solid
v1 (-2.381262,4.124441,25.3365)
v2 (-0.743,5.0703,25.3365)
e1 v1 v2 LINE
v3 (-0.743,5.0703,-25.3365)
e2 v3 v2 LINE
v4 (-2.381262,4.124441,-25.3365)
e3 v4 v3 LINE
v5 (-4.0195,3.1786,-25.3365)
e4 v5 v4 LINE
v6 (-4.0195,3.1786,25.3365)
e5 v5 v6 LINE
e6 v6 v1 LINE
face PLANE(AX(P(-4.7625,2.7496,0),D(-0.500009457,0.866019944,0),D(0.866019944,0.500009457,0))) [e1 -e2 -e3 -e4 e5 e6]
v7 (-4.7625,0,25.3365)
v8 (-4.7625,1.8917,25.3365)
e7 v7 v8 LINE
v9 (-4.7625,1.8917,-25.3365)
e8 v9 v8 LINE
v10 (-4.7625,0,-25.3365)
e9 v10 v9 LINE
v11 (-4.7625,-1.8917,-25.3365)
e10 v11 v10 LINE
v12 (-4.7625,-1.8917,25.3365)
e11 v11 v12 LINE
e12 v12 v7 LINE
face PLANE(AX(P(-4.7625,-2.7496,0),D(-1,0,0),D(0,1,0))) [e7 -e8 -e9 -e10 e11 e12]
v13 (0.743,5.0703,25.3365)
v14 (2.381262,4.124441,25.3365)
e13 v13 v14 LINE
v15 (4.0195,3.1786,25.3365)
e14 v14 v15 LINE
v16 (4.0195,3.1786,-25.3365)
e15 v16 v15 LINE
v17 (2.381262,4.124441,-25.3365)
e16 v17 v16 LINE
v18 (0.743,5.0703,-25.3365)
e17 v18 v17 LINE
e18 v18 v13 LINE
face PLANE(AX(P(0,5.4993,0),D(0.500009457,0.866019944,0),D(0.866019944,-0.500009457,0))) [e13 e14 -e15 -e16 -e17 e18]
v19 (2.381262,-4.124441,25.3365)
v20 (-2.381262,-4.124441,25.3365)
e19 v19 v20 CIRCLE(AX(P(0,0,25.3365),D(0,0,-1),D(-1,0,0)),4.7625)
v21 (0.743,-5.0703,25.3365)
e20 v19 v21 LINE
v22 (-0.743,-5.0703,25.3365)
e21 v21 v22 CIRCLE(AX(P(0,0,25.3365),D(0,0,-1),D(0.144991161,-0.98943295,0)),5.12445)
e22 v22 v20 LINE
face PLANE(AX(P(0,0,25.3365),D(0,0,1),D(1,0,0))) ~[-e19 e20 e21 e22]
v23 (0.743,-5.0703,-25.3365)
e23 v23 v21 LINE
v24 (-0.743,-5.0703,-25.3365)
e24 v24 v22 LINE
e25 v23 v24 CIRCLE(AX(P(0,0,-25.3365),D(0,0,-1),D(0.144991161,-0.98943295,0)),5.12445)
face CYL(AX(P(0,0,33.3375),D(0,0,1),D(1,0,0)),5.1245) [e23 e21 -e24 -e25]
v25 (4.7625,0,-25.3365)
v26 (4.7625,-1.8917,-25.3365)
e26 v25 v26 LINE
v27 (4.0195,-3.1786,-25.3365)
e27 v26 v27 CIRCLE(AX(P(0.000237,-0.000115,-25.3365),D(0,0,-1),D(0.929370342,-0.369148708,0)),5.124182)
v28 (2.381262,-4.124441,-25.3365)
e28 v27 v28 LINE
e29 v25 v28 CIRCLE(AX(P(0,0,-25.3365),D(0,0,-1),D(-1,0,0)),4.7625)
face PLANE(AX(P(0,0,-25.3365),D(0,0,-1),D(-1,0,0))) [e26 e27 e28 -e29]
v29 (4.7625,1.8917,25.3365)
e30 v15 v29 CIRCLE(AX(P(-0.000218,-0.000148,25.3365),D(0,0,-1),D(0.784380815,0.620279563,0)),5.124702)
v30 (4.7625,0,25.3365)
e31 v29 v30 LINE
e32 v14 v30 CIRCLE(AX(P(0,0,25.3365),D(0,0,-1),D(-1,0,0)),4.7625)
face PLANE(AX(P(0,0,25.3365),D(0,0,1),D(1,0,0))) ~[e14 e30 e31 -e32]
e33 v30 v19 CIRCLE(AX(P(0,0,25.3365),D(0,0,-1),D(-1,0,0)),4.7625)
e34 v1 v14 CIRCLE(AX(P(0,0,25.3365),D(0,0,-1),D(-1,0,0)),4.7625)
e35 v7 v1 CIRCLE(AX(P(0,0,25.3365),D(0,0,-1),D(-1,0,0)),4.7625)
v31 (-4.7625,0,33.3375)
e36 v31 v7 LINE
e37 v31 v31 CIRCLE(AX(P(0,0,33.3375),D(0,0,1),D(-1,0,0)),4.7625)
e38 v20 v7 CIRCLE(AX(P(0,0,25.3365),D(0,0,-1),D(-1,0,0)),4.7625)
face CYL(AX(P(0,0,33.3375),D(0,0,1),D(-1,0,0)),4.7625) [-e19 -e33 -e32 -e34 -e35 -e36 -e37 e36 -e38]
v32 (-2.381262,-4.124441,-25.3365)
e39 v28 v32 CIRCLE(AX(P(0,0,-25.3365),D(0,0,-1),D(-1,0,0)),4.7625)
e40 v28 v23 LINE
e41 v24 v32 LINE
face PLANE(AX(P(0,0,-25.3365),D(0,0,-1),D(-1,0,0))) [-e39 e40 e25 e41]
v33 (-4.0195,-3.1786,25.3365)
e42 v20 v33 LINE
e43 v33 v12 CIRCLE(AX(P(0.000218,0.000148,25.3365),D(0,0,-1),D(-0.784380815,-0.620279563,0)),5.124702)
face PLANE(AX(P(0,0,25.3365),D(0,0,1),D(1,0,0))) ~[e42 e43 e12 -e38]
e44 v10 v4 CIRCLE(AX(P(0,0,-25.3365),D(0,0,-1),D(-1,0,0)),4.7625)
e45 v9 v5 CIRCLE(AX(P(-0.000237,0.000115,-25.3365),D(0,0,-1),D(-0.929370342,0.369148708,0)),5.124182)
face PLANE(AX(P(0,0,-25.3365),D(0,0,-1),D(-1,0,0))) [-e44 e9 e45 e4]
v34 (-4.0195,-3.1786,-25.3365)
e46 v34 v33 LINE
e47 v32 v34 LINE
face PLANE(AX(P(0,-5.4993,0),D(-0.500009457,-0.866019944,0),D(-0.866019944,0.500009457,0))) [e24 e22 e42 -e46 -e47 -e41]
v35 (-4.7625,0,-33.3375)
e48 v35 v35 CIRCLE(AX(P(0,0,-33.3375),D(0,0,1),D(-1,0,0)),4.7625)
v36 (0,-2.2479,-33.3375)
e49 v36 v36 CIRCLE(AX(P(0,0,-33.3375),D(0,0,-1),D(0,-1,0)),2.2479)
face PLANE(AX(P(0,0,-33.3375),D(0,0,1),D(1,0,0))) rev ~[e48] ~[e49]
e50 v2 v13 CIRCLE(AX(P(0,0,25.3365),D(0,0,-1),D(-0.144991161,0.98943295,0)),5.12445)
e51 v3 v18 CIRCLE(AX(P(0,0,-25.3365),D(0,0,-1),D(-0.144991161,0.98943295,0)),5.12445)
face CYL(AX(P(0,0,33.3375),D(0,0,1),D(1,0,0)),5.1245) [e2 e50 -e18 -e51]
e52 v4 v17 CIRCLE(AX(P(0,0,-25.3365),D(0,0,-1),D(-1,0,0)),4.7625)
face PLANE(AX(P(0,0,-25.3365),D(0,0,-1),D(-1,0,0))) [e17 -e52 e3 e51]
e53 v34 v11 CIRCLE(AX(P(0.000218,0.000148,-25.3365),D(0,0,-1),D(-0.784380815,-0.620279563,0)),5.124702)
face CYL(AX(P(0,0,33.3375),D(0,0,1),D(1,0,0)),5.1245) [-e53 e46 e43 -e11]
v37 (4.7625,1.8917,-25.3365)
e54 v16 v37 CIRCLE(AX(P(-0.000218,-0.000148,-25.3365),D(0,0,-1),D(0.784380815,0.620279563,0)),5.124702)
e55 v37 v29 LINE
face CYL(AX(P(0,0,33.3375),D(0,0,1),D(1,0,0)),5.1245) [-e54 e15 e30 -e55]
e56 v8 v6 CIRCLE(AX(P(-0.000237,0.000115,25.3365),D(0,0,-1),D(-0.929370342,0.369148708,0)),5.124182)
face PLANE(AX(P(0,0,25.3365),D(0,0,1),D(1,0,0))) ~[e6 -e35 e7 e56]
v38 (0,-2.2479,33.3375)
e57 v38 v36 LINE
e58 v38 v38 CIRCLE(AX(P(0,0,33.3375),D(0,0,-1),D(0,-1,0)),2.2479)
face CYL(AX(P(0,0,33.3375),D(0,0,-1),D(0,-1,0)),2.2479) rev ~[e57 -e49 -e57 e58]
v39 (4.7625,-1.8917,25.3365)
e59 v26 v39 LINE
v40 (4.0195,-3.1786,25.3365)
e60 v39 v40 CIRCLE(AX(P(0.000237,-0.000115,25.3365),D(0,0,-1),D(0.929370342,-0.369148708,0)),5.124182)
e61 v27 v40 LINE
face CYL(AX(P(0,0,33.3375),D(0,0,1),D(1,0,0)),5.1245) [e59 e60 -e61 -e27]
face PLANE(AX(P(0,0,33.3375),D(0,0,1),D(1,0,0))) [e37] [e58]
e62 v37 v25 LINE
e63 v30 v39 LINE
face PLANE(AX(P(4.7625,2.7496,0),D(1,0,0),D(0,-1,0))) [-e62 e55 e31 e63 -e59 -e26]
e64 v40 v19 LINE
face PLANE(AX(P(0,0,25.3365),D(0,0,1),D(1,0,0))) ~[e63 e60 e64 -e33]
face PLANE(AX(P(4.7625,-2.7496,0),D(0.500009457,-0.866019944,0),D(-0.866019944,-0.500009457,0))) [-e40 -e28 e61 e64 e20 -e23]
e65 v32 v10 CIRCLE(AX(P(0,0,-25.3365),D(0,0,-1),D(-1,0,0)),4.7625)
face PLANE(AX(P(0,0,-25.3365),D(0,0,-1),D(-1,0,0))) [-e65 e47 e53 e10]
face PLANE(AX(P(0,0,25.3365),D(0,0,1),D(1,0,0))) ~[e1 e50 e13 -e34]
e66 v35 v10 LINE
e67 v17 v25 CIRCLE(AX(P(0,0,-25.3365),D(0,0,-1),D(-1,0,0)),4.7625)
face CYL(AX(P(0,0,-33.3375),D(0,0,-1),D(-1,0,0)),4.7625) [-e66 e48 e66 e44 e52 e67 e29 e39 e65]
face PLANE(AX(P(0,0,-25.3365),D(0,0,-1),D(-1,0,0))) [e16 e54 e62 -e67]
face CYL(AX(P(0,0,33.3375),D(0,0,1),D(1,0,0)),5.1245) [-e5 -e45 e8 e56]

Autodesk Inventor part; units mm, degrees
ref_plane "YZ Plane" through (0, 0, 0) normal (1, 0, 0) x (0, 1, 0)
ref_plane "XZ Plane" through (0, 0, 0) normal (0, 1, 0) x (-1, 0, 0)
ref_plane "XY Plane" through (0, 0, 0) normal (0, 0, 1) x (1, 0, 0)
sketch "Sketch1" plane through (0, 0, 0) normal (0, 0, 1) x (1, 0, 0)
  line L0 (-4.7625, -2.7496) -> (-4.7625, 2.7496)
  line L1 (-4.7625, 2.7496) -> (0, 5.4993)
  line L2 (0, 5.4993) -> (4.7625, 2.7496)
  line L3 (4.7625, 2.7496) -> (4.7625, -2.7496)
  line L4 (4.7625, -2.7496) -> (0, -5.4993)
  line L5 (0, -5.4993) -> (-4.7625, -2.7496)
  point P0 (0, 0)
  point P1 (0, 0)
  dimension "Size" = 9.525
extrude "Extrusion1" add sketch "Sketch1" along normal mid plane 66.675
sketch "Sketch3" plane through (0, 0, 33.3375) normal (0, 0, 1) x (1, 0, 0)
  line L0 (-4.7625, 2.7496) -> (0, 5.4993) construction
  line L1 (0, 5.4993) -> (4.7625, 2.7496) construction
  line L2 (4.7625, 2.7496) -> (4.7625, -2.7496) construction
  line L3 (4.7625, -2.7496) -> (0, -5.4993) construction
  line L4 (0, -5.4993) -> (-4.7625, -2.7496) construction
  line L5 (-4.7625, -2.7496) -> (-4.7625, 2.7496) construction
  point P0 (0, 0)
hole "Hole1" at (0, 0, 33.3375) direction (0, 0, -1) diameter 4.4958 end through all
sketch "Sketch4" plane through (0, 0, 33.3375) normal (0, 0, 1) x (1, 0, 0)
  circle A0 centre (0, 0) radius 2.2479 construction
  line L0 (-4.7625, 2.7496) -> (0, 5.4993) construction
  line L1 (0, 5.4993) -> (4.7625, 2.7496) construction
  line L2 (4.7625, 2.7496) -> (4.7625, -2.7496) construction
  line L3 (4.7625, -2.7496) -> (0, -5.4993) construction
  line L4 (0, -5.4993) -> (-4.7625, -2.7496) construction
  line L5 (-4.7625, -2.7496) -> (-4.7625, 2.7496) construction
  circle A1 centre (0, 0) radius 5.1245
  circle A2 centre (0, 0) radius 8.89
  dimension "thunder" = 10.2489
  dimension "d16" = 17.78
extrude "Extrusion3" cut sketch "Sketch4" against normal through all
sketch "Sketch5" plane through (0, 0, -33.3375) normal (0, 0, -1) x (-1, 0, 0)
  arc A0 (-4.7625, -1.8917) -> (-4.0195, -3.1786) centre (0, 0) ccw projected
  line L0 (-4.0195, -3.1786) -> (-0.743, -5.0703) projected
  arc A1 (-0.743, -5.0703) -> (0.743, -5.0703) centre (0, 0) ccw projected
  line L1 (0.743, -5.0703) -> (4.0195, -3.1786) projected
  arc A2 (4.0195, -3.1786) -> (4.7625, -1.8917) centre (0, 0) ccw projected
  line L2 (4.7625, -1.8917) -> (4.7625, 1.8917) projected
  arc A3 (4.7625, 1.8917) -> (4.0195, 3.1786) centre (0, 0) ccw projected
  line L3 (4.0195, 3.1786) -> (0.743, 5.0703) projected
  arc A4 (0.743, 5.0703) -> (-0.743, 5.0703) centre (0, 0) ccw projected
  line L4 (-0.743, 5.0703) -> (-4.0195, 3.1786) projected
  arc A5 (-4.0195, 3.1786) -> (-4.7625, 1.8917) centre (0, 0) ccw projected
  line L5 (-4.7625, 1.8917) -> (-4.7625, -1.8917) projected
  circle A6 centre (0, 0) radius 2.2479 projected
  circle A7 centre (0, 0) radius 2.2479 construction
  circle A8 centre (0, 0) radius 4.7625
  point P0 (-4.7625, 0)
  point P1 (-2.3813, 4.1244)
  point P2 (2.3813, 4.1244)
  point P3 (4.7625, 0)
  point P4 (2.3812, -4.1244)
  point P5 (-2.3812, -4.1244)
  dimension "d19" = 9.525
extrude "Extrusion4" cut sketch "Sketch5" against normal blind 8.001 contours L5 A8 L0 A0 | L5 A5 L4 A8 | A8 L1 A1 L0 | L4 A4 L3 A8 | A8 L2 A2 L1 | L3 A3 L2 A8
mirror "Mirror2" about plane through (0, 0, 0) normal (0, 0, 1) of "Extrusion4"
equation "\"bearing\" = 25.4"
properties part number "GP6-008" material "Aluminum 6061"
